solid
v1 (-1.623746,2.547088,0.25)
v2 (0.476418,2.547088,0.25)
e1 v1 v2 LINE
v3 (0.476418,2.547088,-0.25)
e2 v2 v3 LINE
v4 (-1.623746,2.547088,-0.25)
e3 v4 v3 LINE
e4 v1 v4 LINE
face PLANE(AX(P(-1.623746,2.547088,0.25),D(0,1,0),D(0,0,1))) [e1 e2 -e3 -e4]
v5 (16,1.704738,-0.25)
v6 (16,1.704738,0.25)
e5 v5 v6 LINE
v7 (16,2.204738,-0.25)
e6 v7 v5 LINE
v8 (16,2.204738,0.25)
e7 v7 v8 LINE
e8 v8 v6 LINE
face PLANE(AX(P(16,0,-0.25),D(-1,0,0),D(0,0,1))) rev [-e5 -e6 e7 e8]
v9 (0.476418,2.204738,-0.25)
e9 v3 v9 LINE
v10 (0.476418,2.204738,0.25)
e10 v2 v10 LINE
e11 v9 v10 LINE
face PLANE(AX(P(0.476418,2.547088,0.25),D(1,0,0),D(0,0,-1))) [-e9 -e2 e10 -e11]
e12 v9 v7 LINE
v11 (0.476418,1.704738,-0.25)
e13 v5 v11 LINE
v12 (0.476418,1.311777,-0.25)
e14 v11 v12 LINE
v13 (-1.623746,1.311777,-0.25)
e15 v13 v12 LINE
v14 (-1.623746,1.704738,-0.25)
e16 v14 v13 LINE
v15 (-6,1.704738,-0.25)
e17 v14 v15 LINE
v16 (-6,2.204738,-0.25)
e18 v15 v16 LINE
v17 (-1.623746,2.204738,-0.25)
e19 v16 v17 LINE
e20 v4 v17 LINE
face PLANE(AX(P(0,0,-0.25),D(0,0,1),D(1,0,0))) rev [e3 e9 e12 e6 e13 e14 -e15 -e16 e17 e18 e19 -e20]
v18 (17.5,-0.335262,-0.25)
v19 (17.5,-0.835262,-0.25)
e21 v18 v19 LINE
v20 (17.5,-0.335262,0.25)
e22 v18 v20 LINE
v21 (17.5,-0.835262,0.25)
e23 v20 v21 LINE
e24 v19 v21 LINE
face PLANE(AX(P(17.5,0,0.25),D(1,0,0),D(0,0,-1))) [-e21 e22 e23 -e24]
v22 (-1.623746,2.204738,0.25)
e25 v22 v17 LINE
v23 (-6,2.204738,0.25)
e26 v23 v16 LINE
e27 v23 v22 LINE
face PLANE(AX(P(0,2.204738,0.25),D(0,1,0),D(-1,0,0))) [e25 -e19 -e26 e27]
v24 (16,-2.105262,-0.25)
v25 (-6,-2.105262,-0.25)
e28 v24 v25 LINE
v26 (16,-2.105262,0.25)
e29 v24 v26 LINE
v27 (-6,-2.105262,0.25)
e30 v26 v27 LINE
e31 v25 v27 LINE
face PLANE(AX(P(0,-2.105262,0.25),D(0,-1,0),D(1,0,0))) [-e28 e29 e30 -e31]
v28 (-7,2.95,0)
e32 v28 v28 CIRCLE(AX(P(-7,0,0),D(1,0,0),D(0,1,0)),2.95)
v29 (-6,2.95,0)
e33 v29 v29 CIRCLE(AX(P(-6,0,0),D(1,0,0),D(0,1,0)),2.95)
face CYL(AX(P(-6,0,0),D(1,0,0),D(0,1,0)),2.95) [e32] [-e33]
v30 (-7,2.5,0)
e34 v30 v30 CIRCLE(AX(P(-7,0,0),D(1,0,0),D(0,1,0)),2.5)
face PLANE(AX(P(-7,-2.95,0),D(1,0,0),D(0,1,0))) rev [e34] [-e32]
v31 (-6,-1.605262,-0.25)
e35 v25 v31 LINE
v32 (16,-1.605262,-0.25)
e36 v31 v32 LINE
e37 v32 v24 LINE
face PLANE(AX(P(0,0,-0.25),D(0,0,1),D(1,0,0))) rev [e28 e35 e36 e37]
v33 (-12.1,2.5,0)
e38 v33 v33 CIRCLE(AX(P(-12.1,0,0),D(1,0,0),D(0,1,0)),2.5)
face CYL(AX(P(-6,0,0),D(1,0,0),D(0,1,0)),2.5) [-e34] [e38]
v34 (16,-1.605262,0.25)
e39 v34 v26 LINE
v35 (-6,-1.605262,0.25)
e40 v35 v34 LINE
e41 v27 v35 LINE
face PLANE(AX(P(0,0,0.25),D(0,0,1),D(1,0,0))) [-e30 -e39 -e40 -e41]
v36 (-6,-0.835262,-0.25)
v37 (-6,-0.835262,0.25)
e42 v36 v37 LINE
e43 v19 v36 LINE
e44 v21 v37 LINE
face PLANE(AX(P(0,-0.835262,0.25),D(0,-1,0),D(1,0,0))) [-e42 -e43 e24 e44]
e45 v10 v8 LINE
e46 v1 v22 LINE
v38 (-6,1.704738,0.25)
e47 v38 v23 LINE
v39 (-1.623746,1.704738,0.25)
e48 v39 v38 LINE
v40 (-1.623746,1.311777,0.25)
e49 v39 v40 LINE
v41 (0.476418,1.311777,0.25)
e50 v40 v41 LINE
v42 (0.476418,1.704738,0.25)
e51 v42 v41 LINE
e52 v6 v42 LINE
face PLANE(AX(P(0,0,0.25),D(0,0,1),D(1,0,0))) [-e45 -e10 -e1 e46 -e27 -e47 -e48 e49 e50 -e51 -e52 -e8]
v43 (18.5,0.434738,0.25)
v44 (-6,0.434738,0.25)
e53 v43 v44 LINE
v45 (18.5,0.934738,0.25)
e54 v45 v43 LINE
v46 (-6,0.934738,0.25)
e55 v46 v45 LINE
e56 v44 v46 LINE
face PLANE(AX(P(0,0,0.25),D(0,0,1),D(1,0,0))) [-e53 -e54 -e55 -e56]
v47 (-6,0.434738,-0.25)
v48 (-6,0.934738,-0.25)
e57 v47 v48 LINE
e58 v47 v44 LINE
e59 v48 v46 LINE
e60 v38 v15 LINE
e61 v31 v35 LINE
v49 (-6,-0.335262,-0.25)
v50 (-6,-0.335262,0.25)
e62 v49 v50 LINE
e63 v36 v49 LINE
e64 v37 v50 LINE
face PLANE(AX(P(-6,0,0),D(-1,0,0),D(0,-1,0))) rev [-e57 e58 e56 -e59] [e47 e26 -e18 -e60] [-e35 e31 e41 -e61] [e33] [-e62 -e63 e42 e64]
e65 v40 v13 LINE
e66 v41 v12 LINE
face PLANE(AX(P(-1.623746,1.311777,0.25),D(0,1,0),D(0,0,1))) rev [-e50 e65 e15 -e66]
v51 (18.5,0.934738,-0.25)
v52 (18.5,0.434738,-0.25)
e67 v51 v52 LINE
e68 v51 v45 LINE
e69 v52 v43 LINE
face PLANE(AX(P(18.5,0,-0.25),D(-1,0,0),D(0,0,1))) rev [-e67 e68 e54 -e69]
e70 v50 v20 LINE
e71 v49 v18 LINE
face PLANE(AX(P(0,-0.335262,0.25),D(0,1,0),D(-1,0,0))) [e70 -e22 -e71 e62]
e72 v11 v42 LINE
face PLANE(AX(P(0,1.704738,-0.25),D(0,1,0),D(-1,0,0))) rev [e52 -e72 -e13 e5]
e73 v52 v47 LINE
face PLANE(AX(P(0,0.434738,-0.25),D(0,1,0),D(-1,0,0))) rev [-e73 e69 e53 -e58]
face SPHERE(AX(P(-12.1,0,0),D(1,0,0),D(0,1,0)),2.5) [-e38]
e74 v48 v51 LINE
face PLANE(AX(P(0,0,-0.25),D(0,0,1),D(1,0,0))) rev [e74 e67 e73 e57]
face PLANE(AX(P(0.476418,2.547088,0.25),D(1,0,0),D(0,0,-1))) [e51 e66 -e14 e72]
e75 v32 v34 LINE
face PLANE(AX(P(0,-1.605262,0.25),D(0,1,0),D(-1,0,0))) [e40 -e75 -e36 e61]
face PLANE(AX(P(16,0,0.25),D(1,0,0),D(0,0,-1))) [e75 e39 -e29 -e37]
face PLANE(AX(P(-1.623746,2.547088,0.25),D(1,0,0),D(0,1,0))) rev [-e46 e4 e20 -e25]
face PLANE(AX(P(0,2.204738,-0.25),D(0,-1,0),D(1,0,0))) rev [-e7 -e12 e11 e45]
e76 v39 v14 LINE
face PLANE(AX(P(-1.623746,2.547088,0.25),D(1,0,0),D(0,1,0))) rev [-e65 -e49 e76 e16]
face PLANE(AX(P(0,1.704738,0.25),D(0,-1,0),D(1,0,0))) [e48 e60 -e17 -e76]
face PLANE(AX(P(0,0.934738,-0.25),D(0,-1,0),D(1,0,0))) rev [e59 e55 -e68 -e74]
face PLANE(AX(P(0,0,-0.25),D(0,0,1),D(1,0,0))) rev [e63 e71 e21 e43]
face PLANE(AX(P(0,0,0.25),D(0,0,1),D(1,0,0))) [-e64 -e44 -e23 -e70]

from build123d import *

# Parameters (mm, degrees)
BOSS_EXTRUDE1_DEPTH      = 0.25
BOSS_EXTRUDE1_DEPTH_BACK = 0.25
SKETCH2_W                = 22
SKETCH2_H                = 0.5
SKETCH2_W_2              = 23.5
SKETCH2_W_3              = 24.5


with BuildPart() as part:
    # Sketch1 → Revolve1 (revolve)
    with BuildSketch(Plane.XY):
        with BuildLine():
            Line((-6, 0), (-6, -2.95))
            Line((-6, -2.95), (-7, -2.95))
            Line((-7, -2.95), (-7, -2.5))
            Line((-7, -2.5), (-12.1, -2.5))
            ThreePointArc((-12.1, -2.5), (-13.867766953, -1.767766953), (-14.6, 0))
            Line((-14.6, 0), (-6, 0))
        make_face()
    revolve(axis=Axis((-6, 0, 0), (-1, 0, 0)))

    # Sketch2 → Boss-Extrude1 (add, two sides: drawn at the far end of the back side and taken through both)
    with BuildSketch(Plane.XY.offset(-BOSS_EXTRUDE1_DEPTH_BACK)):
        with Locations((5, -1.855262181)):
            Rectangle(SKETCH2_W, SKETCH2_H)
        with Locations((5.75, -0.585262181)):
            Rectangle(SKETCH2_W_2, SKETCH2_H)
        with Locations((6.25, 0.684737819)):
            Rectangle(SKETCH2_W_3, SKETCH2_H)
        Polygon((-1.623745911, 2.204737819), (-6, 2.204737819), (-6, 1.704737819), (-1.623745911, 1.704737819), (-1.623745911, 1.311776605), (0.47641813, 1.311776605), (0.47641813, 1.704737819), (16, 1.704737819), (16, 2.204737819), (0.47641813, 2.204737819), (0.47641813, 2.547088342), (-1.623745911, 2.547088342), align=None)
    extrude(amount=BOSS_EXTRUDE1_DEPTH + BOSS_EXTRUDE1_DEPTH_BACK)


solid = part.part
